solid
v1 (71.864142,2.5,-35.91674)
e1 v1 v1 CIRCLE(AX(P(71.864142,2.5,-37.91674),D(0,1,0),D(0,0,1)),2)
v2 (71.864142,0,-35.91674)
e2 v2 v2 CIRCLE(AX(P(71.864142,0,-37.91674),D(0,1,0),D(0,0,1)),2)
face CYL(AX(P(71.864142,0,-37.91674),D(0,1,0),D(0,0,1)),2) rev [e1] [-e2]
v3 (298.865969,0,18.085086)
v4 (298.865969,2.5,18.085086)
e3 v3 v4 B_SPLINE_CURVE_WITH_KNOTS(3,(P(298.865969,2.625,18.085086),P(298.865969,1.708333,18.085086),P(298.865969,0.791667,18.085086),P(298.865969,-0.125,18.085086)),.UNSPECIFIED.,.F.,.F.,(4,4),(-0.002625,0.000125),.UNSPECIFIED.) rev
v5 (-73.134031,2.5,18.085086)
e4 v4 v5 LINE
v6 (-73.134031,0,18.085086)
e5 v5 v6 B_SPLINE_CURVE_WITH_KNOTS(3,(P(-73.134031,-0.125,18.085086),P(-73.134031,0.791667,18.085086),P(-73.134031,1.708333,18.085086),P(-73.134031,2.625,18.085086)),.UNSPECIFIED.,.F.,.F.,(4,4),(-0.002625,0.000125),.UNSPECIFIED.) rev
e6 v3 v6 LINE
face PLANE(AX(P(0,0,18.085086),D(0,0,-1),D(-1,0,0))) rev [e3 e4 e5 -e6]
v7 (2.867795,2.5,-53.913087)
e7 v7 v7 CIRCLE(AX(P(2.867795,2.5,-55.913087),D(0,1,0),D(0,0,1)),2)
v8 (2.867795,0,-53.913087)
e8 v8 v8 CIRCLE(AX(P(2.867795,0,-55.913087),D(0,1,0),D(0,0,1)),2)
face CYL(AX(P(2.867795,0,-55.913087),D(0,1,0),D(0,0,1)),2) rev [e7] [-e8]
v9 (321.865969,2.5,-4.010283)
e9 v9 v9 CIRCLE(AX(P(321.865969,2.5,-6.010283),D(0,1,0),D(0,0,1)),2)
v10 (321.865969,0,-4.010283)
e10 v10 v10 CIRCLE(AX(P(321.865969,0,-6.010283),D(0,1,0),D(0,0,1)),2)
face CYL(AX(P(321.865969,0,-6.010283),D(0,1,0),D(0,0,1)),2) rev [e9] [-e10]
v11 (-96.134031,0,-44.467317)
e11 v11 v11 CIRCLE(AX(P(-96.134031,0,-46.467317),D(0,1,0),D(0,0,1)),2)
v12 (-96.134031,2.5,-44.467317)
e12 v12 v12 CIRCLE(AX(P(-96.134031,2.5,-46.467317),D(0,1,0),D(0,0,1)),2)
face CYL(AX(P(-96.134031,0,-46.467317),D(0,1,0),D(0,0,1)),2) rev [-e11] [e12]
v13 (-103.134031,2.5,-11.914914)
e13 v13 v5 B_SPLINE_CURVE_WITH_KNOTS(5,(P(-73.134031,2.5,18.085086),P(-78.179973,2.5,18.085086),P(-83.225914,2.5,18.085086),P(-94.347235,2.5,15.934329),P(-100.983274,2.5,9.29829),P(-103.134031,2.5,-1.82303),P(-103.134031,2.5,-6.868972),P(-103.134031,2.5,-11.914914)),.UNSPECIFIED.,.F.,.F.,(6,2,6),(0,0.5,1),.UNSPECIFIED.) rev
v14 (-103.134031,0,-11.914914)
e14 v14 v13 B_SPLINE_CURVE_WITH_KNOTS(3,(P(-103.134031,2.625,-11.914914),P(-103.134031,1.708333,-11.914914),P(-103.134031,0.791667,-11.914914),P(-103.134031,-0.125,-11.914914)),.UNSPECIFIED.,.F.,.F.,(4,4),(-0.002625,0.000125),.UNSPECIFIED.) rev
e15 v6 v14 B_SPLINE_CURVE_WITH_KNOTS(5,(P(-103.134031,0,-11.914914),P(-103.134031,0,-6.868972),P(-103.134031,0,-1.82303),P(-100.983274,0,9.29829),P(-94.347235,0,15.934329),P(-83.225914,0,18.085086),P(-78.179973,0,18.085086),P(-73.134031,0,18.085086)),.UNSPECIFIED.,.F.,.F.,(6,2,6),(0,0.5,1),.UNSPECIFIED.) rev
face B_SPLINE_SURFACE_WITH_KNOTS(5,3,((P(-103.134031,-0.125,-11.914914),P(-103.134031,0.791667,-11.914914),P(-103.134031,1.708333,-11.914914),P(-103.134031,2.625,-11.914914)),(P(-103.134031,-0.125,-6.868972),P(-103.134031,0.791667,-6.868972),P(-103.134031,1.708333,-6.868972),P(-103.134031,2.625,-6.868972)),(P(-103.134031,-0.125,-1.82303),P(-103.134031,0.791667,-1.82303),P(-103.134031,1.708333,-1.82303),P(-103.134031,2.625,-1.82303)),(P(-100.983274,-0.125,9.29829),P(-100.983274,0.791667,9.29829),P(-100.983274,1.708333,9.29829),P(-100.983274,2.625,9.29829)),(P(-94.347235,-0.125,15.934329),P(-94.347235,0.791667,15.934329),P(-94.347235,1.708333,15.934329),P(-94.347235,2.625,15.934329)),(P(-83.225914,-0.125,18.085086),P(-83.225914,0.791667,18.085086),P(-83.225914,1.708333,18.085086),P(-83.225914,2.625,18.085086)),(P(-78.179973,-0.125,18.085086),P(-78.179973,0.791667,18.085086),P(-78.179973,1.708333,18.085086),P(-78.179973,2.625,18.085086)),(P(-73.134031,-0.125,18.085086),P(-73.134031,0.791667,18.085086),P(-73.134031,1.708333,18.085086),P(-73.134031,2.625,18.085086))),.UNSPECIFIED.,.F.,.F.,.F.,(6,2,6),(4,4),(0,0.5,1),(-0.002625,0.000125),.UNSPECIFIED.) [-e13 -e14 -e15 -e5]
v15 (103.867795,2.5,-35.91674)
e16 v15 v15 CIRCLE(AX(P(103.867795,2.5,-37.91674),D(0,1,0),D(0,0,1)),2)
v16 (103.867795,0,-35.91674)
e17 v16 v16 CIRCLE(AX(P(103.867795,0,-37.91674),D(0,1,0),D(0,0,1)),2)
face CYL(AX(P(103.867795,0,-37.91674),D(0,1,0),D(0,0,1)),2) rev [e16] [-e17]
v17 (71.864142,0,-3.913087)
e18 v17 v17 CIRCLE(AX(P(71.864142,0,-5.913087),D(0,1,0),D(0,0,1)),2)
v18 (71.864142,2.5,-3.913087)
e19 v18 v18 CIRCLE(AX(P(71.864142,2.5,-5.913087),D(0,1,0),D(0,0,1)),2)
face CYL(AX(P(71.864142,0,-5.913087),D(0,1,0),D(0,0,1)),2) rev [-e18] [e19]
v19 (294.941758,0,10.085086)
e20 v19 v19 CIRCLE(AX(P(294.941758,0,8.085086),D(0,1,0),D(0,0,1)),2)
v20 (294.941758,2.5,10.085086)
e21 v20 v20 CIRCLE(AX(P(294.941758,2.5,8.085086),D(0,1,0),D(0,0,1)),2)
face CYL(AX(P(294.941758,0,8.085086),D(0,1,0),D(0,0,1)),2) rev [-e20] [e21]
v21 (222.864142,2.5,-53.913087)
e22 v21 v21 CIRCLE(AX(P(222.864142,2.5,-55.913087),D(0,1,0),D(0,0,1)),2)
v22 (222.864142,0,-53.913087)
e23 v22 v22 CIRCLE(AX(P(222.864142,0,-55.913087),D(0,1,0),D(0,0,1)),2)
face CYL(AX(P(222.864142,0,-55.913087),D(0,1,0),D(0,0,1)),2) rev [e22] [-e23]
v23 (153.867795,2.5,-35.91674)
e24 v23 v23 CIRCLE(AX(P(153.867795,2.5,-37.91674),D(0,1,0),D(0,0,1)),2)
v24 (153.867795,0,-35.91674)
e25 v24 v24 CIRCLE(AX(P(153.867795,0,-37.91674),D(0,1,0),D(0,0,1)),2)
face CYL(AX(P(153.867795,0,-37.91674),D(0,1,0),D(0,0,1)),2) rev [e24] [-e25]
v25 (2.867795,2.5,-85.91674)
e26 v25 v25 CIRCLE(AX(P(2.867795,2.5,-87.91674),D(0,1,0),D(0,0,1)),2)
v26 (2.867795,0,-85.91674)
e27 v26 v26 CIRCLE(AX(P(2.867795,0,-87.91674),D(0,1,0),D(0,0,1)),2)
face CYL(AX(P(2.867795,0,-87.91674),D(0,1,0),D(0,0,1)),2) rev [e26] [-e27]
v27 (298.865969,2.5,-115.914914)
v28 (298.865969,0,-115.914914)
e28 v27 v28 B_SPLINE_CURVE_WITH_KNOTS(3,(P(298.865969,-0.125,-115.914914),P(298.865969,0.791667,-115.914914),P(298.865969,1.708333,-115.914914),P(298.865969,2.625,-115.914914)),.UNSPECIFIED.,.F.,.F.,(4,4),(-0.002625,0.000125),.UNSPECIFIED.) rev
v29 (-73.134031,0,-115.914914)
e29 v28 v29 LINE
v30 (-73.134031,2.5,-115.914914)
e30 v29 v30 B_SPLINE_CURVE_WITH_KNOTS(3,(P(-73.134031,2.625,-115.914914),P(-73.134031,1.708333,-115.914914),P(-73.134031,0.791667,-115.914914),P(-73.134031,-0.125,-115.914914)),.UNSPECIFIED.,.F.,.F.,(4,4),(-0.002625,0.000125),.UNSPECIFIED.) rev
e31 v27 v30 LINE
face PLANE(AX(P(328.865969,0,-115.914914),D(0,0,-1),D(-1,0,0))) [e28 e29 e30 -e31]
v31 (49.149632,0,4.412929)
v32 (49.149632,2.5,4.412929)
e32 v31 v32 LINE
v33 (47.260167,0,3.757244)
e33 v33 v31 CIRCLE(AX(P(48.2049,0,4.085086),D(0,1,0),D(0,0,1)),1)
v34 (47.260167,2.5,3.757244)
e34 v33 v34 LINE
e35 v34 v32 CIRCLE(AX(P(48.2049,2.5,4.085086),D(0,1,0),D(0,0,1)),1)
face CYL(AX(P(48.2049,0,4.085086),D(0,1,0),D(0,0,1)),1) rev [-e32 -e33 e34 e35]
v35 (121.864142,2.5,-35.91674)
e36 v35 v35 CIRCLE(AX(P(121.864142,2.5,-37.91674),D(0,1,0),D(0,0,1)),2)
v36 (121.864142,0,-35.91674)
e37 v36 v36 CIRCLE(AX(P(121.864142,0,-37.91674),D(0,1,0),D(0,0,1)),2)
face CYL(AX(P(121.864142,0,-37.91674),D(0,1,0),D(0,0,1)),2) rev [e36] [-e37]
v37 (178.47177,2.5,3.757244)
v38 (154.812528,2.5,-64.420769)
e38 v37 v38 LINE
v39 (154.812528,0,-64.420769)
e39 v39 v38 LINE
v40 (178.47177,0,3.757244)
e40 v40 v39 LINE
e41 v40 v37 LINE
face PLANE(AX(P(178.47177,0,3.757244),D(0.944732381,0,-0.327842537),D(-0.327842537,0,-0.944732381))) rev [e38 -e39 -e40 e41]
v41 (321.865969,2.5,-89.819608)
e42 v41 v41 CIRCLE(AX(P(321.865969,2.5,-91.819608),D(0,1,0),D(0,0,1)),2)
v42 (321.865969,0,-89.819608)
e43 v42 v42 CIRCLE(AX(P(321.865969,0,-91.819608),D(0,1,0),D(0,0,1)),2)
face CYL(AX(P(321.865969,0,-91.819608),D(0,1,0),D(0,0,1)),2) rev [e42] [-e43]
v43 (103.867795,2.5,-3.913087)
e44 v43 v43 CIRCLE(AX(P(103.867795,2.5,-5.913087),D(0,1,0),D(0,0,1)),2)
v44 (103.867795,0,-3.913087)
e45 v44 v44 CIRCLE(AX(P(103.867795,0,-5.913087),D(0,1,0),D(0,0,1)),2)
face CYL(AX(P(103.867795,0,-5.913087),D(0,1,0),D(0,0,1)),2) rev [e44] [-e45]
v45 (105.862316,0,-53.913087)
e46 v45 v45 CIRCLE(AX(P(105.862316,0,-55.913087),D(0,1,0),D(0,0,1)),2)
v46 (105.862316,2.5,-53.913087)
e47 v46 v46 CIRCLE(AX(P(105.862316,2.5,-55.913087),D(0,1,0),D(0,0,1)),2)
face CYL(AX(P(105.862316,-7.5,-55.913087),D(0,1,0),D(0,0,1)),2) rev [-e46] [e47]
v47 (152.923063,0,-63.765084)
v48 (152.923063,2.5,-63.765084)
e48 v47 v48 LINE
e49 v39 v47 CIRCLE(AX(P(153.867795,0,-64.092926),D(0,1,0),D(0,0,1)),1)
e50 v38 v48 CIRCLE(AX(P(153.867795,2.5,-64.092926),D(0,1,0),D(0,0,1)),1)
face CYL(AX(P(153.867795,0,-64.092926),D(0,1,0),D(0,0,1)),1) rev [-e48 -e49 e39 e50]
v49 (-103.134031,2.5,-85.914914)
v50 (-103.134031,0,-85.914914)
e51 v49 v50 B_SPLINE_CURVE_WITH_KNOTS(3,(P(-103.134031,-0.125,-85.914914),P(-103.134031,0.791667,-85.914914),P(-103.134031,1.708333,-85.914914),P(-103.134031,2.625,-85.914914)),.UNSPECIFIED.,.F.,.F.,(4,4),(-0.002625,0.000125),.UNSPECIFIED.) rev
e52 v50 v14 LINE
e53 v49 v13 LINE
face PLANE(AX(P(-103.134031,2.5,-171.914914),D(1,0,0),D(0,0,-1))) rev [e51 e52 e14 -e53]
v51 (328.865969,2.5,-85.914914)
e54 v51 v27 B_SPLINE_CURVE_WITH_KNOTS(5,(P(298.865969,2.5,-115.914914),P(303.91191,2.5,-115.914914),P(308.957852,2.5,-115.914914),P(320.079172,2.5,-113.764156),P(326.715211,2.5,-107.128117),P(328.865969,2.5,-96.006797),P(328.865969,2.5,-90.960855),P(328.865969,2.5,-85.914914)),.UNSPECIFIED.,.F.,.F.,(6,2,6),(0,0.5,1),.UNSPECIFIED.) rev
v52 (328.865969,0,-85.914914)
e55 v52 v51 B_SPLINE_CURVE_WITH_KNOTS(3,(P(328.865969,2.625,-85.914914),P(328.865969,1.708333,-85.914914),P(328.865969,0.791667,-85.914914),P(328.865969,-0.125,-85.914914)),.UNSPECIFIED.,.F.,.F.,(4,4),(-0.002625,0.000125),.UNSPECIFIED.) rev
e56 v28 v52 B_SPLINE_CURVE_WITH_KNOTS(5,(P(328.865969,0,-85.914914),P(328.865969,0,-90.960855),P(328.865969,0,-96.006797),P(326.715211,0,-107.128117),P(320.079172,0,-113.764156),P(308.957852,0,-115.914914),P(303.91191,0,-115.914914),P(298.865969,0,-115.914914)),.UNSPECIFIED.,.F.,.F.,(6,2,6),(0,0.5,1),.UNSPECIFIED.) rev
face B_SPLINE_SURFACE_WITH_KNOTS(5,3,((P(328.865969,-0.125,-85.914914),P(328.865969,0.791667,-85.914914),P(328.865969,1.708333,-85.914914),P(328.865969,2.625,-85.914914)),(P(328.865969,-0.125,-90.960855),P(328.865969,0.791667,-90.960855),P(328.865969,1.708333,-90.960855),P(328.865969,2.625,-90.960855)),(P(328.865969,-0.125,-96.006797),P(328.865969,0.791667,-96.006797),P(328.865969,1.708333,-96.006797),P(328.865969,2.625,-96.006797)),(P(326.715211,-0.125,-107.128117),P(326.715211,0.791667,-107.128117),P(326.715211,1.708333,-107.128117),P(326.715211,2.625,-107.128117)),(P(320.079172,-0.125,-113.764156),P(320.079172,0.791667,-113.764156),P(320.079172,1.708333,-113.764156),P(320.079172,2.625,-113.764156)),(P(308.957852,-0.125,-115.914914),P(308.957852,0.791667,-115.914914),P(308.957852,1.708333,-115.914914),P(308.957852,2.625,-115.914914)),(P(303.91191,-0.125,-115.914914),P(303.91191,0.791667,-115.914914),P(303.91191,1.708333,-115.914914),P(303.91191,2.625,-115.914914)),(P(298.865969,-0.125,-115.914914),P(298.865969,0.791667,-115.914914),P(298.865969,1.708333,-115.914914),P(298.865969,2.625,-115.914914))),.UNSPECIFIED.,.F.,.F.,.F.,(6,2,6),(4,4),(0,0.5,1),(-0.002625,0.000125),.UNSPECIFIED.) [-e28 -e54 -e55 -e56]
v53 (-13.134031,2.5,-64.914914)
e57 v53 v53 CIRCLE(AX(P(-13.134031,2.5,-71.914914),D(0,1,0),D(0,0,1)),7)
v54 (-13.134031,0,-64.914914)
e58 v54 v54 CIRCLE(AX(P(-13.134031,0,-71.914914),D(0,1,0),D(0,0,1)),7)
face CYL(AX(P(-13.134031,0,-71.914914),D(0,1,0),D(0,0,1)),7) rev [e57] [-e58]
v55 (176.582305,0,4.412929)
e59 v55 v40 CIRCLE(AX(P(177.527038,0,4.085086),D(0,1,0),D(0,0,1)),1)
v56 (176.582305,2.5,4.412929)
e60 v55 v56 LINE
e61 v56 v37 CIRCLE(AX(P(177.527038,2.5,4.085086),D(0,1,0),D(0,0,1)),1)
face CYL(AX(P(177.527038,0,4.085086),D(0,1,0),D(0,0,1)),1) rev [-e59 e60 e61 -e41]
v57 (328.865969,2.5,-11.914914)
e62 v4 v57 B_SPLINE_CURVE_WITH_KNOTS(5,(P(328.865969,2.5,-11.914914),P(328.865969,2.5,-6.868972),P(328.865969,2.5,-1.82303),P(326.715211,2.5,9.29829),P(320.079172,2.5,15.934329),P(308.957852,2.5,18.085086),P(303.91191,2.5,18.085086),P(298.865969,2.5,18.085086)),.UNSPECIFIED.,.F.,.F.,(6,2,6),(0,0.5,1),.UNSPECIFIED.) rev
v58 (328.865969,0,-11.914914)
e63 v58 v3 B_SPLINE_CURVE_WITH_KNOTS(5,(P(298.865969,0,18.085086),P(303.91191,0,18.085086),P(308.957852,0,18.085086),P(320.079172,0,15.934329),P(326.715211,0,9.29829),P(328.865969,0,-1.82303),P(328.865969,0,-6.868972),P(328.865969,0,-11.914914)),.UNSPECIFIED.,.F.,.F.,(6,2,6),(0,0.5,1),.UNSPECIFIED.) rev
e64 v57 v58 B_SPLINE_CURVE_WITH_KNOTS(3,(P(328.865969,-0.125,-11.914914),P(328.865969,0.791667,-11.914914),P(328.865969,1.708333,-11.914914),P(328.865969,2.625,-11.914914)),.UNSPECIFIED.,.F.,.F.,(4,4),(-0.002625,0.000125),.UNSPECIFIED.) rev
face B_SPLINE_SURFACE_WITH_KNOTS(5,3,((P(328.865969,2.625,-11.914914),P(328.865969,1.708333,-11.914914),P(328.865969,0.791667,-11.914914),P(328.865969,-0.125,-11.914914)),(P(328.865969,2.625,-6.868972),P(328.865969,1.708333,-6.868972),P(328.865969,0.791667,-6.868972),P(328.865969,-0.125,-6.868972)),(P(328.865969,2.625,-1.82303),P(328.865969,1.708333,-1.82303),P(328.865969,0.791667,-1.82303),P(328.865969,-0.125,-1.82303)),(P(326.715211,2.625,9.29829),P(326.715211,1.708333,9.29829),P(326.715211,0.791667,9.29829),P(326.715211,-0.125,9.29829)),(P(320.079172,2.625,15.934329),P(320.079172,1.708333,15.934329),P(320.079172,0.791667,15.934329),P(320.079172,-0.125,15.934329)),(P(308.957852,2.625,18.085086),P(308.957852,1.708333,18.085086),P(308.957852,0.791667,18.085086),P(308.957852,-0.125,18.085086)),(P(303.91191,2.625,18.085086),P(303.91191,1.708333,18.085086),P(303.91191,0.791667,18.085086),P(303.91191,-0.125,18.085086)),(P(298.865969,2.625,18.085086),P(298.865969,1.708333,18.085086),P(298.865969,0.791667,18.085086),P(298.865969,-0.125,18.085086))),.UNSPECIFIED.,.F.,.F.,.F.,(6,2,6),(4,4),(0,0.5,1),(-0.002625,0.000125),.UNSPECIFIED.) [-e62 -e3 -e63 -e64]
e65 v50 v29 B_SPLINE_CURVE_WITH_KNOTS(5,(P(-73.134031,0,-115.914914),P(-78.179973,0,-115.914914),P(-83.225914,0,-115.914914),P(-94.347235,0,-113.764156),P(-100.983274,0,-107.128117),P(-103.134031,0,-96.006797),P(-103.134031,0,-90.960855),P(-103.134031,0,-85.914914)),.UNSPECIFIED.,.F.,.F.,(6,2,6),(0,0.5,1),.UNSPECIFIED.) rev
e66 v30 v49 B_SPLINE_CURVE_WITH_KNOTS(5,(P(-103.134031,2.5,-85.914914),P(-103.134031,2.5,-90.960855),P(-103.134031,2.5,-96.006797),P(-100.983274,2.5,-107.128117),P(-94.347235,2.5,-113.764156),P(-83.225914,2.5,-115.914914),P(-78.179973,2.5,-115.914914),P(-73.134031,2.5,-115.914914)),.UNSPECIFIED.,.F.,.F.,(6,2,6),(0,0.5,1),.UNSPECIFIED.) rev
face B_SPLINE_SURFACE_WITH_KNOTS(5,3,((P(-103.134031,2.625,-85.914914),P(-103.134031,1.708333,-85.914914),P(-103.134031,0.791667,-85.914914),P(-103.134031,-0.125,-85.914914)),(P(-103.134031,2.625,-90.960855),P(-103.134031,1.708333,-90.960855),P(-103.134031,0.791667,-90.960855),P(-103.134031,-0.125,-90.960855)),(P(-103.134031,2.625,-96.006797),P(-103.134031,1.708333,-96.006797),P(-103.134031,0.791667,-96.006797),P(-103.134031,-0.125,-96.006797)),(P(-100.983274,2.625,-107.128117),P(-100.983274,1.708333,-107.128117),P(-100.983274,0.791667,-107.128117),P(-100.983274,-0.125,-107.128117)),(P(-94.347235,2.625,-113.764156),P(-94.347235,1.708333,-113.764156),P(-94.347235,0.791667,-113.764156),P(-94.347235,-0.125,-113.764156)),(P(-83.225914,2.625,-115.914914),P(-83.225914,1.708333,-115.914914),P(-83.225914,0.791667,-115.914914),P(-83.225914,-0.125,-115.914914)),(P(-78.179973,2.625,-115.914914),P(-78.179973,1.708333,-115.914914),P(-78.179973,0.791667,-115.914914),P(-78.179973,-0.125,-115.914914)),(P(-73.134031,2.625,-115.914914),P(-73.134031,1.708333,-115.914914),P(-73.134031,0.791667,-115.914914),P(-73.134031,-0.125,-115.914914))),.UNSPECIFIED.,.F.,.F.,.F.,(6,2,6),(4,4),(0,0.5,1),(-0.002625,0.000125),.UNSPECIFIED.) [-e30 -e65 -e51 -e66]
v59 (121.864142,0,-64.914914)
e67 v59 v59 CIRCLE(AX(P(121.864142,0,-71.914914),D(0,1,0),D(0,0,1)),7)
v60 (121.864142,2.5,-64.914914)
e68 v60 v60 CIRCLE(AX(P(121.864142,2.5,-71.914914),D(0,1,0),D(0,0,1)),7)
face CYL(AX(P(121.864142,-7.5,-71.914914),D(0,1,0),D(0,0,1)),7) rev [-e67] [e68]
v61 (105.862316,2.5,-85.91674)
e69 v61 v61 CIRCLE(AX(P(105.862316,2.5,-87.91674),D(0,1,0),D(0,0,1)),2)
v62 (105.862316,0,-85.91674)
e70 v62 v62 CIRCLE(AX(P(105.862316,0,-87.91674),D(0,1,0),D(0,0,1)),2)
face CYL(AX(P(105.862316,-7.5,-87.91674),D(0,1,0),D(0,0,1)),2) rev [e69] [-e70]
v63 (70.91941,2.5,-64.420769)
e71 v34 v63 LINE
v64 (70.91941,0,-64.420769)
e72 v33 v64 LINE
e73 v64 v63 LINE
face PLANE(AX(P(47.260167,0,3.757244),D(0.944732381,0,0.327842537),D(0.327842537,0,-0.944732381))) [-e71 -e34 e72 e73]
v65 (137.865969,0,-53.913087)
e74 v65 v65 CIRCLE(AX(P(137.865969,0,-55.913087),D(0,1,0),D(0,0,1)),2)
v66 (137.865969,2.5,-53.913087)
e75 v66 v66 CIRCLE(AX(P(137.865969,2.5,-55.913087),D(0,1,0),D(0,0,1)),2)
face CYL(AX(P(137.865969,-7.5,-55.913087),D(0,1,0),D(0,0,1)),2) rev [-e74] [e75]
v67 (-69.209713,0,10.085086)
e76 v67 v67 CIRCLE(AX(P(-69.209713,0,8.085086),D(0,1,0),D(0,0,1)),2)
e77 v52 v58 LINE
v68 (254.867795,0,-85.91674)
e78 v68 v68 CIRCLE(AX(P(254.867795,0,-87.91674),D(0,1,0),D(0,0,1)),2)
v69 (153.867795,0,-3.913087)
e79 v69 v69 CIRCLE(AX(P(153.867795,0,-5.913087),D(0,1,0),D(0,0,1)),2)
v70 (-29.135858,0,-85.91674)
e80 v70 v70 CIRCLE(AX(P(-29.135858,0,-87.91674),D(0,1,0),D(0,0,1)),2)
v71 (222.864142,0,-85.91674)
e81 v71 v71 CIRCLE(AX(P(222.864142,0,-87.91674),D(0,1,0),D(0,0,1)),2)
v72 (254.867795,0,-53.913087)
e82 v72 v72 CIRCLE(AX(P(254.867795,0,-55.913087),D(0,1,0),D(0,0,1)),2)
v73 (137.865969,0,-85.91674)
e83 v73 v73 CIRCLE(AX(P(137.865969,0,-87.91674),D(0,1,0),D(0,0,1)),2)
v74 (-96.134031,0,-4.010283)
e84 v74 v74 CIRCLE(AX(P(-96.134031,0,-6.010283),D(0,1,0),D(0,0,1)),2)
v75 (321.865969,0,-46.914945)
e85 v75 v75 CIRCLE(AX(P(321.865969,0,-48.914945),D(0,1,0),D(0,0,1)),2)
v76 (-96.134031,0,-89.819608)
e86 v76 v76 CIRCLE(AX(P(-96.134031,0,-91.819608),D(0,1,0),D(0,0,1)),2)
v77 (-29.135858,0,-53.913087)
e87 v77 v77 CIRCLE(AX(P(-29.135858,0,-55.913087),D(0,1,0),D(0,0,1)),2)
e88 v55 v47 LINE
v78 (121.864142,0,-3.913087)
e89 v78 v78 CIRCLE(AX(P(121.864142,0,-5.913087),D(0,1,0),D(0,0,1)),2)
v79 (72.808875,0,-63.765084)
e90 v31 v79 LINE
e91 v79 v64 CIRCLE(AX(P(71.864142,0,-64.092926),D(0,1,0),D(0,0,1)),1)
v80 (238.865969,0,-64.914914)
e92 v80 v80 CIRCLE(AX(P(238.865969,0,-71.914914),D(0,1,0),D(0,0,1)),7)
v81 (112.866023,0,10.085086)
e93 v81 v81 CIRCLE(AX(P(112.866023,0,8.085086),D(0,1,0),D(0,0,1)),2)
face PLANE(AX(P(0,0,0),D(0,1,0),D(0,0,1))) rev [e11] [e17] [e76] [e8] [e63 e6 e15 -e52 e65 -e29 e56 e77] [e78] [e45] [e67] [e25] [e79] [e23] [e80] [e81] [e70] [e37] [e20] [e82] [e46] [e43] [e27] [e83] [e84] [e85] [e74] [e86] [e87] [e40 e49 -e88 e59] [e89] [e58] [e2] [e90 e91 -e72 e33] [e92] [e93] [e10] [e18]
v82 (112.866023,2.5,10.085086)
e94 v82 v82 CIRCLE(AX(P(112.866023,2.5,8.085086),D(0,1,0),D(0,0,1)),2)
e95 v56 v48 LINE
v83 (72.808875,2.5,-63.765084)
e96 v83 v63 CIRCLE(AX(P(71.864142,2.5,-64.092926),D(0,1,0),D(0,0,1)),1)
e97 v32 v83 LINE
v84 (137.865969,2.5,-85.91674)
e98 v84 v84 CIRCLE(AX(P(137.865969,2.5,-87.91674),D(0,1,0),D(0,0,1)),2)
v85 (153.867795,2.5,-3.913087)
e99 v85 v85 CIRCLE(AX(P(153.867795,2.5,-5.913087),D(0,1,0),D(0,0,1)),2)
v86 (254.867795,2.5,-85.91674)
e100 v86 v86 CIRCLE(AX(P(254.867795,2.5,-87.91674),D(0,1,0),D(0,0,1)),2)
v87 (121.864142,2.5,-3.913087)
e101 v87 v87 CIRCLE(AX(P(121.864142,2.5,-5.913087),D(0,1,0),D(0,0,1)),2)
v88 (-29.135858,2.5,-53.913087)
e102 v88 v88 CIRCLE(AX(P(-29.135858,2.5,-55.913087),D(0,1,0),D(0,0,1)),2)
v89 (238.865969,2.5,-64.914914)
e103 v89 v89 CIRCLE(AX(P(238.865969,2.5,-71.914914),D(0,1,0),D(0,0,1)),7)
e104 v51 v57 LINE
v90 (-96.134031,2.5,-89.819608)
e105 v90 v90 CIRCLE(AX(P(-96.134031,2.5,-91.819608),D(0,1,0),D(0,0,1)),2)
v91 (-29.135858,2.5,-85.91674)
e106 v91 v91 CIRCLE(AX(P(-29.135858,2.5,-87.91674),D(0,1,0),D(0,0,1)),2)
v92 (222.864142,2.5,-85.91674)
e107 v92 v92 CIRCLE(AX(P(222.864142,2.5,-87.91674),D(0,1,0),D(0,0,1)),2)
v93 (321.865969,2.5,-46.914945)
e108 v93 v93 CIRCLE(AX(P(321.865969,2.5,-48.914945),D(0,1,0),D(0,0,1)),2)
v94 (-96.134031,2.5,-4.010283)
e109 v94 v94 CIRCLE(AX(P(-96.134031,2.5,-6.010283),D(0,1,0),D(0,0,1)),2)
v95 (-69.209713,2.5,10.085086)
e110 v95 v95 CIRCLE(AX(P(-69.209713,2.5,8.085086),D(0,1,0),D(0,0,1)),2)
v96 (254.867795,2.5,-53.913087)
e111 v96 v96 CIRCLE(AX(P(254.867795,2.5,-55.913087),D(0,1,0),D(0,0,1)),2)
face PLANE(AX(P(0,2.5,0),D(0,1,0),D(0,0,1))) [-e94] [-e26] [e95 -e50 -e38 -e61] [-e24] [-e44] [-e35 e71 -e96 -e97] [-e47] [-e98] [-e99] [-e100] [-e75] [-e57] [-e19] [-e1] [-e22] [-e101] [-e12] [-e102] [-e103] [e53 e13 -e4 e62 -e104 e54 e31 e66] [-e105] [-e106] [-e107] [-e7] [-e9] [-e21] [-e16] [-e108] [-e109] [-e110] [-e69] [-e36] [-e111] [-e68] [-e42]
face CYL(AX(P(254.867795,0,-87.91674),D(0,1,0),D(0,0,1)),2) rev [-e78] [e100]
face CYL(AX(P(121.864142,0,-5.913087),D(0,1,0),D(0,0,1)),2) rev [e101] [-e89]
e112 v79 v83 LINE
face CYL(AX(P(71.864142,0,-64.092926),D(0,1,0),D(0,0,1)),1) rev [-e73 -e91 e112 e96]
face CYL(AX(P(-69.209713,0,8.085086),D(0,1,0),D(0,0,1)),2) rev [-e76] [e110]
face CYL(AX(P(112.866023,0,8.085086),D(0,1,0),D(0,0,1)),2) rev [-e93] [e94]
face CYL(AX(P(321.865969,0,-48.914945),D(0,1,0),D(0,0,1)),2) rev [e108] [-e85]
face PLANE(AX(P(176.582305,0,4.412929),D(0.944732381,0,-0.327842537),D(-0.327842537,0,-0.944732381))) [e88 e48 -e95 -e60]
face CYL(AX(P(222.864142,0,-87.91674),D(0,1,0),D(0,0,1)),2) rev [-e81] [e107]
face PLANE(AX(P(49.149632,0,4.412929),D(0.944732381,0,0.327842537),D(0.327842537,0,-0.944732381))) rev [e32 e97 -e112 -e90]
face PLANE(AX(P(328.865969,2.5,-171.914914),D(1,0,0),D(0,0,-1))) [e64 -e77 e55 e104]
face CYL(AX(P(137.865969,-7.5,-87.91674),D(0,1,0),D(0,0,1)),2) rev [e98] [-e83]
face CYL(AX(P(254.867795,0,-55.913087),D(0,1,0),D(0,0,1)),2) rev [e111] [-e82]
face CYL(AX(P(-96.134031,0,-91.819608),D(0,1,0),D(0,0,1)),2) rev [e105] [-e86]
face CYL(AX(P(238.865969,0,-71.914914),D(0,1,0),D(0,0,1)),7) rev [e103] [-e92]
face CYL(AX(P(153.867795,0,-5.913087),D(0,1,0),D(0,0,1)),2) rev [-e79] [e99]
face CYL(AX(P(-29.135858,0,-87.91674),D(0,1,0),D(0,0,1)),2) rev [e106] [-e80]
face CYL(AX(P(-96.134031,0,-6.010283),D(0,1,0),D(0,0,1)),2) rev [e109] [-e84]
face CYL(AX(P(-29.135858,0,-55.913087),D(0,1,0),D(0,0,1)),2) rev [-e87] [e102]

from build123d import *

# Parameters (mm, degrees)
SKETCH1_W           = 432
SKETCH1_H           = 200
BOSS_EXTRUDE1_DEPTH = 2.5
SKETCH3_R           = 7
SKETCH3_R_2         = 2
SKETCH3_W           = 498.20945101
SKETCH3_H           = 57.36356312
CUT_EXTRUDE1_DEPTH  = 2.5
SKETCH5_W           = 366.875294571
SKETCH5_H           = 10
SKETCH5_W_2         = 65.124705429
CUT_EXTRUDE3_DEPTH  = 2.5
SKETCH6_R           = 2
CUT_EXTRUDE4_DEPTH  = 2.5
CUT_EXTRUDE5_DEPTH  = 2.5
FILLET1_SIZE        = 30
SKETCH9_R           = 2
CUT_EXTRUDE6_DEPTH  = 2.5
SKETCH10_R          = 2
CUT_EXTRUDE7_DEPTH  = 2.5
SKETCH11_R          = 7
SKETCH11_R_2        = 2
CUT_EXTRUDE8_DEPTH  = 10


with BuildPart() as part:
    # Sketch1 → Boss-Extrude1 (new body)
    with BuildSketch(Plane(origin=(0, 0, 0), x_dir=(1, 0, 0), z_dir=(0, 1, 0))):
        with Locations((112.865968756, 71.914913526)):
            Rectangle(SKETCH1_W, SKETCH1_H)
    extrude(amount=BOSS_EXTRUDE1_DEPTH)

    # Sketch3 → Cut-Extrude1 (cut)
    with BuildSketch(Plane(origin=(0, 2.5, 0), x_dir=(1, 0, 0), z_dir=(0, 1, 0))):
        with Locations(Location((-13.134031244, 71.914913526, 0), (0, 0, 270))):
            Circle(SKETCH3_R)
        with Locations(Location((-29.135857702, 55.913087067, 0), (0, 0, 270))):
            Circle(SKETCH3_R_2)
        with Locations(Location((-29.135857702, 87.916739984, 0), (0, 0, 270))):
            Circle(SKETCH3_R_2)
        with Locations(Location((2.867795214, 55.913087067, 0), (0, 0, 270))):
            Circle(SKETCH3_R_2)
        with Locations(Location((2.867795214, 87.916739984, 0), (0, 0, 270))):
            Circle(SKETCH3_R_2)
        with Locations(Location((238.865968756, 71.914913526, 0), (0, 0, 270))):
            Circle(SKETCH3_R)
        with Locations((79.761243251, 144.596695086)):
            Rectangle(SKETCH3_W, SKETCH3_H)
        with Locations(Location((222.864142298, 55.913087067, 0), (0, 0, 270))):
            Circle(SKETCH3_R_2)
        with Locations(Location((254.867795214, 87.916739984, 0), (0, 0, 270))):
            Circle(SKETCH3_R_2)
        with Locations(Location((222.864142298, 87.916739984, 0), (0, 0, 270))):
            Circle(SKETCH3_R_2)
        with Locations(Location((254.867795214, 55.913087067, 0), (0, 0, 270))):
            Circle(SKETCH3_R_2)
    extrude(amount=-CUT_EXTRUDE1_DEPTH, mode=Mode.SUBTRACT)

    # Sketch5 → Cut-Extrude3 (cut)
    with BuildSketch(Plane(origin=(0, 2.5, 0), x_dir=(1, 0, 0), z_dir=(0, 1, 0))):
        with Locations((80.303616041, -23.085086474)):
            Rectangle(SKETCH5_W, SKETCH5_H)
        with Locations((296.303616042, -23.085086474)):
            Rectangle(SKETCH5_W_2, SKETCH5_H)
    extrude(amount=-CUT_EXTRUDE3_DEPTH, mode=Mode.SUBTRACT)

    # Sketch6 → Cut-Extrude4 (cut)
    with BuildSketch(Plane(origin=(0, 2.5, 0), x_dir=(1, 0, 0), z_dir=(0, 1, 0))):
        with Locations(Location((71.864142298, 5.913087067, 0), (0, 0, 270))):
            Circle(SKETCH6_R)
        with Locations(Location((71.864142298, 37.916739984, 0), (0, 0, 270))):
            Circle(SKETCH6_R)
        with Locations(Location((103.867795214, 37.916739984, 0), (0, 0, 270))):
            Circle(SKETCH6_R)
        with Locations(Location((103.867795214, 5.913087067, 0), (0, 0, 270))):
            Circle(SKETCH6_R)
        with Locations(Location((121.864142298, 5.913087067, 0), (0, 0, 270))):
            Circle(SKETCH6_R)
        with Locations(Location((121.864142298, 37.916739984, 0), (0, 0, 270))):
            Circle(SKETCH6_R)
        with Locations(Location((153.867795214, 37.916739984, 0), (0, 0, 270))):
            Circle(SKETCH6_R)
        with Locations(Location((153.867795214, 5.913087067, 0), (0, 0, 270))):
            Circle(SKETCH6_R)
    extrude(amount=-CUT_EXTRUDE4_DEPTH, mode=Mode.SUBTRACT)

    # Sketch8 → Cut-Extrude5 (cut)
    with BuildSketch(Plane(origin=(0, 2.5, 0), x_dir=(1, 0, 0), z_dir=(0, 1, 0))):
        with BuildLine():
            Line((176.582305496, -4.412929011), (152.923062834, 63.765083659))
            ThreePointArc((152.923062834, 63.765083659), (153.539952677, 65.037658577), (154.812527595, 64.420768733))
            Line((154.812527595, 64.420768733), (178.471770257, -3.757243937))
            ThreePointArc((178.471770257, -3.757243937), (177.854880414, -5.029818855), (176.582305496, -4.412929011))
        make_face()
        with BuildLine():
            Line((47.260167255, -3.757243937), (70.919409917, 64.420768733))
            ThreePointArc((70.919409917, 64.420768733), (72.191984835, 65.037658577), (72.808874679, 63.765083659))
            Line((72.808874679, 63.765083659), (49.149632016, -4.412929011))
            ThreePointArc((49.149632016, -4.412929011), (47.877057099, -5.029818855), (47.260167255, -3.757243937))
        make_face()
    extrude(amount=-CUT_EXTRUDE5_DEPTH, mode=Mode.SUBTRACT)

    # Fillet1
    # a fillet whose section is not a circle: 30 mm, written as the material it takes off along each edge
    with BuildSketch(Plane(origin=(-103.134031244, -75, -115.914913526), x_dir=(0, 0, 1), z_dir=(0, 1, 0)), Plane(origin=(-103.134031244, 77.5, 18.085086474), x_dir=(0, 0, -1), z_dir=(0, -1, 0)), Plane(origin=(328.865968756, 77.5, 18.085086474), x_dir=(-1, 0, 0), z_dir=(0, -1, 0))) as fillet1_piece_1:
        with BuildLine():
            add(Edge.make_bspline([(FILLET1_SIZE, 0), (FILLET1_SIZE * 0.831801948466, 0), (FILLET1_SIZE * 0.663603896932, 0), (FILLET1_SIZE * 0.292893218813, FILLET1_SIZE * 0.0716919198361), (FILLET1_SIZE * 0.0716919198361, FILLET1_SIZE * 0.292893218813), (0, FILLET1_SIZE * 0.663603896932), (0, FILLET1_SIZE * 0.831801948466), (0, FILLET1_SIZE)], knots=[0, 0, 0, 0, 0, 0, 0.5, 0.5, 1, 1, 1, 1, 1, 1], degree=5))
            Line((0, FILLET1_SIZE), (0, 0))
            Line((0, 0), (FILLET1_SIZE, 0))
        make_face()
    extrude(amount=152.5, mode=Mode.SUBTRACT)
    with BuildSketch(Plane(origin=(328.865968756, 77.5, -115.914913526), x_dir=(-1, 0, 0), z_dir=(0, -1, 0))) as fillet1_piece_2:
        with BuildLine():
            add(Edge.make_bspline([(FILLET1_SIZE, 0), (FILLET1_SIZE * 0.831801948466, 0), (FILLET1_SIZE * 0.663603896932, 0), (FILLET1_SIZE * 0.292893218813, -FILLET1_SIZE * 0.0716919198361), (FILLET1_SIZE * 0.0716919198361, -FILLET1_SIZE * 0.292893218813), (0, -FILLET1_SIZE * 0.663603896932), (0, -FILLET1_SIZE * 0.831801948466), (0, -FILLET1_SIZE)], knots=[0, 0, 0, 0, 0, 0, 0.5, 0.5, 1, 1, 1, 1, 1, 1], degree=5))
            Line((0, -FILLET1_SIZE), (0, 0))
            Line((0, 0), (FILLET1_SIZE, 0))
        make_face()
    extrude(amount=152.5, mode=Mode.SUBTRACT)

    # Sketch9 → Cut-Extrude6 (cut)
    with BuildSketch(Plane(origin=(0, 2.5, 0), x_dir=(1, 0, 0), z_dir=(0, 1, 0))):
        with Locations(Location((321.865968752, 6.010283068, 0), (0, 0, 270))):
            Circle(SKETCH9_R)
        with Locations(Location((321.865968752, 48.914945481, 0), (0, 0, 270))):
            Circle(SKETCH9_R)
        with Locations(Location((321.865968752, 91.819607898, 0), (0, 0, 270))):
            Circle(SKETCH9_R)
        with Locations(Location((-96.134031244, 46.467317494, 0), (0, 0, 270))):
            Circle(SKETCH9_R)
        with Locations(Location((-96.134031244, 91.819607898, 0), (0, 0, 270))):
            Circle(SKETCH9_R)
        with Locations(Location((-96.134031244, 6.010283068, 0), (0, 0, 270))):
            Circle(SKETCH9_R)
    extrude(amount=-CUT_EXTRUDE6_DEPTH, mode=Mode.SUBTRACT)

    # Sketch10 → Cut-Extrude7 (cut)
    with BuildSketch(Plane(origin=(0, 2.5, 0), x_dir=(1, 0, 0), z_dir=(0, 1, 0))):
        with Locations(Location((112.866022655, -8.085086472, 0), (0, 0, 270))):
            Circle(SKETCH10_R)
        with Locations(Location((294.941757967, -8.085086472, 0), (0, 0, 270))):
            Circle(SKETCH10_R)
        with Locations(Location((-69.209712656, -8.085086472, 0), (0, 0, 270))):
            Circle(SKETCH10_R)
    extrude(amount=-CUT_EXTRUDE7_DEPTH, mode=Mode.SUBTRACT)

    # Sketch11 → Cut-Extrude8 (cut)
    with BuildSketch(Plane(origin=(0, 2.5, 0), x_dir=(1, 0, 0), z_dir=(0, 1, 0))):
        with Locations(Location((121.864142298, 71.914913526, 0), (0, 0, 270))):
            Circle(SKETCH11_R)
        with Locations(Location((105.86231584, 55.913087067, 0), (0, 0, 270))):
            Circle(SKETCH11_R_2)
        with Locations(Location((137.865968756, 87.916739984, 0), (0, 0, 270))):
            Circle(SKETCH11_R_2)
        with Locations(Location((137.865968756, 55.913087067, 0), (0, 0, 270))):
            Circle(SKETCH11_R_2)
        with Locations(Location((105.86231584, 87.916739984, 0), (0, 0, 270))):
            Circle(SKETCH11_R_2)
    extrude(amount=-CUT_EXTRUDE8_DEPTH, mode=Mode.SUBTRACT)


solid = part.part
